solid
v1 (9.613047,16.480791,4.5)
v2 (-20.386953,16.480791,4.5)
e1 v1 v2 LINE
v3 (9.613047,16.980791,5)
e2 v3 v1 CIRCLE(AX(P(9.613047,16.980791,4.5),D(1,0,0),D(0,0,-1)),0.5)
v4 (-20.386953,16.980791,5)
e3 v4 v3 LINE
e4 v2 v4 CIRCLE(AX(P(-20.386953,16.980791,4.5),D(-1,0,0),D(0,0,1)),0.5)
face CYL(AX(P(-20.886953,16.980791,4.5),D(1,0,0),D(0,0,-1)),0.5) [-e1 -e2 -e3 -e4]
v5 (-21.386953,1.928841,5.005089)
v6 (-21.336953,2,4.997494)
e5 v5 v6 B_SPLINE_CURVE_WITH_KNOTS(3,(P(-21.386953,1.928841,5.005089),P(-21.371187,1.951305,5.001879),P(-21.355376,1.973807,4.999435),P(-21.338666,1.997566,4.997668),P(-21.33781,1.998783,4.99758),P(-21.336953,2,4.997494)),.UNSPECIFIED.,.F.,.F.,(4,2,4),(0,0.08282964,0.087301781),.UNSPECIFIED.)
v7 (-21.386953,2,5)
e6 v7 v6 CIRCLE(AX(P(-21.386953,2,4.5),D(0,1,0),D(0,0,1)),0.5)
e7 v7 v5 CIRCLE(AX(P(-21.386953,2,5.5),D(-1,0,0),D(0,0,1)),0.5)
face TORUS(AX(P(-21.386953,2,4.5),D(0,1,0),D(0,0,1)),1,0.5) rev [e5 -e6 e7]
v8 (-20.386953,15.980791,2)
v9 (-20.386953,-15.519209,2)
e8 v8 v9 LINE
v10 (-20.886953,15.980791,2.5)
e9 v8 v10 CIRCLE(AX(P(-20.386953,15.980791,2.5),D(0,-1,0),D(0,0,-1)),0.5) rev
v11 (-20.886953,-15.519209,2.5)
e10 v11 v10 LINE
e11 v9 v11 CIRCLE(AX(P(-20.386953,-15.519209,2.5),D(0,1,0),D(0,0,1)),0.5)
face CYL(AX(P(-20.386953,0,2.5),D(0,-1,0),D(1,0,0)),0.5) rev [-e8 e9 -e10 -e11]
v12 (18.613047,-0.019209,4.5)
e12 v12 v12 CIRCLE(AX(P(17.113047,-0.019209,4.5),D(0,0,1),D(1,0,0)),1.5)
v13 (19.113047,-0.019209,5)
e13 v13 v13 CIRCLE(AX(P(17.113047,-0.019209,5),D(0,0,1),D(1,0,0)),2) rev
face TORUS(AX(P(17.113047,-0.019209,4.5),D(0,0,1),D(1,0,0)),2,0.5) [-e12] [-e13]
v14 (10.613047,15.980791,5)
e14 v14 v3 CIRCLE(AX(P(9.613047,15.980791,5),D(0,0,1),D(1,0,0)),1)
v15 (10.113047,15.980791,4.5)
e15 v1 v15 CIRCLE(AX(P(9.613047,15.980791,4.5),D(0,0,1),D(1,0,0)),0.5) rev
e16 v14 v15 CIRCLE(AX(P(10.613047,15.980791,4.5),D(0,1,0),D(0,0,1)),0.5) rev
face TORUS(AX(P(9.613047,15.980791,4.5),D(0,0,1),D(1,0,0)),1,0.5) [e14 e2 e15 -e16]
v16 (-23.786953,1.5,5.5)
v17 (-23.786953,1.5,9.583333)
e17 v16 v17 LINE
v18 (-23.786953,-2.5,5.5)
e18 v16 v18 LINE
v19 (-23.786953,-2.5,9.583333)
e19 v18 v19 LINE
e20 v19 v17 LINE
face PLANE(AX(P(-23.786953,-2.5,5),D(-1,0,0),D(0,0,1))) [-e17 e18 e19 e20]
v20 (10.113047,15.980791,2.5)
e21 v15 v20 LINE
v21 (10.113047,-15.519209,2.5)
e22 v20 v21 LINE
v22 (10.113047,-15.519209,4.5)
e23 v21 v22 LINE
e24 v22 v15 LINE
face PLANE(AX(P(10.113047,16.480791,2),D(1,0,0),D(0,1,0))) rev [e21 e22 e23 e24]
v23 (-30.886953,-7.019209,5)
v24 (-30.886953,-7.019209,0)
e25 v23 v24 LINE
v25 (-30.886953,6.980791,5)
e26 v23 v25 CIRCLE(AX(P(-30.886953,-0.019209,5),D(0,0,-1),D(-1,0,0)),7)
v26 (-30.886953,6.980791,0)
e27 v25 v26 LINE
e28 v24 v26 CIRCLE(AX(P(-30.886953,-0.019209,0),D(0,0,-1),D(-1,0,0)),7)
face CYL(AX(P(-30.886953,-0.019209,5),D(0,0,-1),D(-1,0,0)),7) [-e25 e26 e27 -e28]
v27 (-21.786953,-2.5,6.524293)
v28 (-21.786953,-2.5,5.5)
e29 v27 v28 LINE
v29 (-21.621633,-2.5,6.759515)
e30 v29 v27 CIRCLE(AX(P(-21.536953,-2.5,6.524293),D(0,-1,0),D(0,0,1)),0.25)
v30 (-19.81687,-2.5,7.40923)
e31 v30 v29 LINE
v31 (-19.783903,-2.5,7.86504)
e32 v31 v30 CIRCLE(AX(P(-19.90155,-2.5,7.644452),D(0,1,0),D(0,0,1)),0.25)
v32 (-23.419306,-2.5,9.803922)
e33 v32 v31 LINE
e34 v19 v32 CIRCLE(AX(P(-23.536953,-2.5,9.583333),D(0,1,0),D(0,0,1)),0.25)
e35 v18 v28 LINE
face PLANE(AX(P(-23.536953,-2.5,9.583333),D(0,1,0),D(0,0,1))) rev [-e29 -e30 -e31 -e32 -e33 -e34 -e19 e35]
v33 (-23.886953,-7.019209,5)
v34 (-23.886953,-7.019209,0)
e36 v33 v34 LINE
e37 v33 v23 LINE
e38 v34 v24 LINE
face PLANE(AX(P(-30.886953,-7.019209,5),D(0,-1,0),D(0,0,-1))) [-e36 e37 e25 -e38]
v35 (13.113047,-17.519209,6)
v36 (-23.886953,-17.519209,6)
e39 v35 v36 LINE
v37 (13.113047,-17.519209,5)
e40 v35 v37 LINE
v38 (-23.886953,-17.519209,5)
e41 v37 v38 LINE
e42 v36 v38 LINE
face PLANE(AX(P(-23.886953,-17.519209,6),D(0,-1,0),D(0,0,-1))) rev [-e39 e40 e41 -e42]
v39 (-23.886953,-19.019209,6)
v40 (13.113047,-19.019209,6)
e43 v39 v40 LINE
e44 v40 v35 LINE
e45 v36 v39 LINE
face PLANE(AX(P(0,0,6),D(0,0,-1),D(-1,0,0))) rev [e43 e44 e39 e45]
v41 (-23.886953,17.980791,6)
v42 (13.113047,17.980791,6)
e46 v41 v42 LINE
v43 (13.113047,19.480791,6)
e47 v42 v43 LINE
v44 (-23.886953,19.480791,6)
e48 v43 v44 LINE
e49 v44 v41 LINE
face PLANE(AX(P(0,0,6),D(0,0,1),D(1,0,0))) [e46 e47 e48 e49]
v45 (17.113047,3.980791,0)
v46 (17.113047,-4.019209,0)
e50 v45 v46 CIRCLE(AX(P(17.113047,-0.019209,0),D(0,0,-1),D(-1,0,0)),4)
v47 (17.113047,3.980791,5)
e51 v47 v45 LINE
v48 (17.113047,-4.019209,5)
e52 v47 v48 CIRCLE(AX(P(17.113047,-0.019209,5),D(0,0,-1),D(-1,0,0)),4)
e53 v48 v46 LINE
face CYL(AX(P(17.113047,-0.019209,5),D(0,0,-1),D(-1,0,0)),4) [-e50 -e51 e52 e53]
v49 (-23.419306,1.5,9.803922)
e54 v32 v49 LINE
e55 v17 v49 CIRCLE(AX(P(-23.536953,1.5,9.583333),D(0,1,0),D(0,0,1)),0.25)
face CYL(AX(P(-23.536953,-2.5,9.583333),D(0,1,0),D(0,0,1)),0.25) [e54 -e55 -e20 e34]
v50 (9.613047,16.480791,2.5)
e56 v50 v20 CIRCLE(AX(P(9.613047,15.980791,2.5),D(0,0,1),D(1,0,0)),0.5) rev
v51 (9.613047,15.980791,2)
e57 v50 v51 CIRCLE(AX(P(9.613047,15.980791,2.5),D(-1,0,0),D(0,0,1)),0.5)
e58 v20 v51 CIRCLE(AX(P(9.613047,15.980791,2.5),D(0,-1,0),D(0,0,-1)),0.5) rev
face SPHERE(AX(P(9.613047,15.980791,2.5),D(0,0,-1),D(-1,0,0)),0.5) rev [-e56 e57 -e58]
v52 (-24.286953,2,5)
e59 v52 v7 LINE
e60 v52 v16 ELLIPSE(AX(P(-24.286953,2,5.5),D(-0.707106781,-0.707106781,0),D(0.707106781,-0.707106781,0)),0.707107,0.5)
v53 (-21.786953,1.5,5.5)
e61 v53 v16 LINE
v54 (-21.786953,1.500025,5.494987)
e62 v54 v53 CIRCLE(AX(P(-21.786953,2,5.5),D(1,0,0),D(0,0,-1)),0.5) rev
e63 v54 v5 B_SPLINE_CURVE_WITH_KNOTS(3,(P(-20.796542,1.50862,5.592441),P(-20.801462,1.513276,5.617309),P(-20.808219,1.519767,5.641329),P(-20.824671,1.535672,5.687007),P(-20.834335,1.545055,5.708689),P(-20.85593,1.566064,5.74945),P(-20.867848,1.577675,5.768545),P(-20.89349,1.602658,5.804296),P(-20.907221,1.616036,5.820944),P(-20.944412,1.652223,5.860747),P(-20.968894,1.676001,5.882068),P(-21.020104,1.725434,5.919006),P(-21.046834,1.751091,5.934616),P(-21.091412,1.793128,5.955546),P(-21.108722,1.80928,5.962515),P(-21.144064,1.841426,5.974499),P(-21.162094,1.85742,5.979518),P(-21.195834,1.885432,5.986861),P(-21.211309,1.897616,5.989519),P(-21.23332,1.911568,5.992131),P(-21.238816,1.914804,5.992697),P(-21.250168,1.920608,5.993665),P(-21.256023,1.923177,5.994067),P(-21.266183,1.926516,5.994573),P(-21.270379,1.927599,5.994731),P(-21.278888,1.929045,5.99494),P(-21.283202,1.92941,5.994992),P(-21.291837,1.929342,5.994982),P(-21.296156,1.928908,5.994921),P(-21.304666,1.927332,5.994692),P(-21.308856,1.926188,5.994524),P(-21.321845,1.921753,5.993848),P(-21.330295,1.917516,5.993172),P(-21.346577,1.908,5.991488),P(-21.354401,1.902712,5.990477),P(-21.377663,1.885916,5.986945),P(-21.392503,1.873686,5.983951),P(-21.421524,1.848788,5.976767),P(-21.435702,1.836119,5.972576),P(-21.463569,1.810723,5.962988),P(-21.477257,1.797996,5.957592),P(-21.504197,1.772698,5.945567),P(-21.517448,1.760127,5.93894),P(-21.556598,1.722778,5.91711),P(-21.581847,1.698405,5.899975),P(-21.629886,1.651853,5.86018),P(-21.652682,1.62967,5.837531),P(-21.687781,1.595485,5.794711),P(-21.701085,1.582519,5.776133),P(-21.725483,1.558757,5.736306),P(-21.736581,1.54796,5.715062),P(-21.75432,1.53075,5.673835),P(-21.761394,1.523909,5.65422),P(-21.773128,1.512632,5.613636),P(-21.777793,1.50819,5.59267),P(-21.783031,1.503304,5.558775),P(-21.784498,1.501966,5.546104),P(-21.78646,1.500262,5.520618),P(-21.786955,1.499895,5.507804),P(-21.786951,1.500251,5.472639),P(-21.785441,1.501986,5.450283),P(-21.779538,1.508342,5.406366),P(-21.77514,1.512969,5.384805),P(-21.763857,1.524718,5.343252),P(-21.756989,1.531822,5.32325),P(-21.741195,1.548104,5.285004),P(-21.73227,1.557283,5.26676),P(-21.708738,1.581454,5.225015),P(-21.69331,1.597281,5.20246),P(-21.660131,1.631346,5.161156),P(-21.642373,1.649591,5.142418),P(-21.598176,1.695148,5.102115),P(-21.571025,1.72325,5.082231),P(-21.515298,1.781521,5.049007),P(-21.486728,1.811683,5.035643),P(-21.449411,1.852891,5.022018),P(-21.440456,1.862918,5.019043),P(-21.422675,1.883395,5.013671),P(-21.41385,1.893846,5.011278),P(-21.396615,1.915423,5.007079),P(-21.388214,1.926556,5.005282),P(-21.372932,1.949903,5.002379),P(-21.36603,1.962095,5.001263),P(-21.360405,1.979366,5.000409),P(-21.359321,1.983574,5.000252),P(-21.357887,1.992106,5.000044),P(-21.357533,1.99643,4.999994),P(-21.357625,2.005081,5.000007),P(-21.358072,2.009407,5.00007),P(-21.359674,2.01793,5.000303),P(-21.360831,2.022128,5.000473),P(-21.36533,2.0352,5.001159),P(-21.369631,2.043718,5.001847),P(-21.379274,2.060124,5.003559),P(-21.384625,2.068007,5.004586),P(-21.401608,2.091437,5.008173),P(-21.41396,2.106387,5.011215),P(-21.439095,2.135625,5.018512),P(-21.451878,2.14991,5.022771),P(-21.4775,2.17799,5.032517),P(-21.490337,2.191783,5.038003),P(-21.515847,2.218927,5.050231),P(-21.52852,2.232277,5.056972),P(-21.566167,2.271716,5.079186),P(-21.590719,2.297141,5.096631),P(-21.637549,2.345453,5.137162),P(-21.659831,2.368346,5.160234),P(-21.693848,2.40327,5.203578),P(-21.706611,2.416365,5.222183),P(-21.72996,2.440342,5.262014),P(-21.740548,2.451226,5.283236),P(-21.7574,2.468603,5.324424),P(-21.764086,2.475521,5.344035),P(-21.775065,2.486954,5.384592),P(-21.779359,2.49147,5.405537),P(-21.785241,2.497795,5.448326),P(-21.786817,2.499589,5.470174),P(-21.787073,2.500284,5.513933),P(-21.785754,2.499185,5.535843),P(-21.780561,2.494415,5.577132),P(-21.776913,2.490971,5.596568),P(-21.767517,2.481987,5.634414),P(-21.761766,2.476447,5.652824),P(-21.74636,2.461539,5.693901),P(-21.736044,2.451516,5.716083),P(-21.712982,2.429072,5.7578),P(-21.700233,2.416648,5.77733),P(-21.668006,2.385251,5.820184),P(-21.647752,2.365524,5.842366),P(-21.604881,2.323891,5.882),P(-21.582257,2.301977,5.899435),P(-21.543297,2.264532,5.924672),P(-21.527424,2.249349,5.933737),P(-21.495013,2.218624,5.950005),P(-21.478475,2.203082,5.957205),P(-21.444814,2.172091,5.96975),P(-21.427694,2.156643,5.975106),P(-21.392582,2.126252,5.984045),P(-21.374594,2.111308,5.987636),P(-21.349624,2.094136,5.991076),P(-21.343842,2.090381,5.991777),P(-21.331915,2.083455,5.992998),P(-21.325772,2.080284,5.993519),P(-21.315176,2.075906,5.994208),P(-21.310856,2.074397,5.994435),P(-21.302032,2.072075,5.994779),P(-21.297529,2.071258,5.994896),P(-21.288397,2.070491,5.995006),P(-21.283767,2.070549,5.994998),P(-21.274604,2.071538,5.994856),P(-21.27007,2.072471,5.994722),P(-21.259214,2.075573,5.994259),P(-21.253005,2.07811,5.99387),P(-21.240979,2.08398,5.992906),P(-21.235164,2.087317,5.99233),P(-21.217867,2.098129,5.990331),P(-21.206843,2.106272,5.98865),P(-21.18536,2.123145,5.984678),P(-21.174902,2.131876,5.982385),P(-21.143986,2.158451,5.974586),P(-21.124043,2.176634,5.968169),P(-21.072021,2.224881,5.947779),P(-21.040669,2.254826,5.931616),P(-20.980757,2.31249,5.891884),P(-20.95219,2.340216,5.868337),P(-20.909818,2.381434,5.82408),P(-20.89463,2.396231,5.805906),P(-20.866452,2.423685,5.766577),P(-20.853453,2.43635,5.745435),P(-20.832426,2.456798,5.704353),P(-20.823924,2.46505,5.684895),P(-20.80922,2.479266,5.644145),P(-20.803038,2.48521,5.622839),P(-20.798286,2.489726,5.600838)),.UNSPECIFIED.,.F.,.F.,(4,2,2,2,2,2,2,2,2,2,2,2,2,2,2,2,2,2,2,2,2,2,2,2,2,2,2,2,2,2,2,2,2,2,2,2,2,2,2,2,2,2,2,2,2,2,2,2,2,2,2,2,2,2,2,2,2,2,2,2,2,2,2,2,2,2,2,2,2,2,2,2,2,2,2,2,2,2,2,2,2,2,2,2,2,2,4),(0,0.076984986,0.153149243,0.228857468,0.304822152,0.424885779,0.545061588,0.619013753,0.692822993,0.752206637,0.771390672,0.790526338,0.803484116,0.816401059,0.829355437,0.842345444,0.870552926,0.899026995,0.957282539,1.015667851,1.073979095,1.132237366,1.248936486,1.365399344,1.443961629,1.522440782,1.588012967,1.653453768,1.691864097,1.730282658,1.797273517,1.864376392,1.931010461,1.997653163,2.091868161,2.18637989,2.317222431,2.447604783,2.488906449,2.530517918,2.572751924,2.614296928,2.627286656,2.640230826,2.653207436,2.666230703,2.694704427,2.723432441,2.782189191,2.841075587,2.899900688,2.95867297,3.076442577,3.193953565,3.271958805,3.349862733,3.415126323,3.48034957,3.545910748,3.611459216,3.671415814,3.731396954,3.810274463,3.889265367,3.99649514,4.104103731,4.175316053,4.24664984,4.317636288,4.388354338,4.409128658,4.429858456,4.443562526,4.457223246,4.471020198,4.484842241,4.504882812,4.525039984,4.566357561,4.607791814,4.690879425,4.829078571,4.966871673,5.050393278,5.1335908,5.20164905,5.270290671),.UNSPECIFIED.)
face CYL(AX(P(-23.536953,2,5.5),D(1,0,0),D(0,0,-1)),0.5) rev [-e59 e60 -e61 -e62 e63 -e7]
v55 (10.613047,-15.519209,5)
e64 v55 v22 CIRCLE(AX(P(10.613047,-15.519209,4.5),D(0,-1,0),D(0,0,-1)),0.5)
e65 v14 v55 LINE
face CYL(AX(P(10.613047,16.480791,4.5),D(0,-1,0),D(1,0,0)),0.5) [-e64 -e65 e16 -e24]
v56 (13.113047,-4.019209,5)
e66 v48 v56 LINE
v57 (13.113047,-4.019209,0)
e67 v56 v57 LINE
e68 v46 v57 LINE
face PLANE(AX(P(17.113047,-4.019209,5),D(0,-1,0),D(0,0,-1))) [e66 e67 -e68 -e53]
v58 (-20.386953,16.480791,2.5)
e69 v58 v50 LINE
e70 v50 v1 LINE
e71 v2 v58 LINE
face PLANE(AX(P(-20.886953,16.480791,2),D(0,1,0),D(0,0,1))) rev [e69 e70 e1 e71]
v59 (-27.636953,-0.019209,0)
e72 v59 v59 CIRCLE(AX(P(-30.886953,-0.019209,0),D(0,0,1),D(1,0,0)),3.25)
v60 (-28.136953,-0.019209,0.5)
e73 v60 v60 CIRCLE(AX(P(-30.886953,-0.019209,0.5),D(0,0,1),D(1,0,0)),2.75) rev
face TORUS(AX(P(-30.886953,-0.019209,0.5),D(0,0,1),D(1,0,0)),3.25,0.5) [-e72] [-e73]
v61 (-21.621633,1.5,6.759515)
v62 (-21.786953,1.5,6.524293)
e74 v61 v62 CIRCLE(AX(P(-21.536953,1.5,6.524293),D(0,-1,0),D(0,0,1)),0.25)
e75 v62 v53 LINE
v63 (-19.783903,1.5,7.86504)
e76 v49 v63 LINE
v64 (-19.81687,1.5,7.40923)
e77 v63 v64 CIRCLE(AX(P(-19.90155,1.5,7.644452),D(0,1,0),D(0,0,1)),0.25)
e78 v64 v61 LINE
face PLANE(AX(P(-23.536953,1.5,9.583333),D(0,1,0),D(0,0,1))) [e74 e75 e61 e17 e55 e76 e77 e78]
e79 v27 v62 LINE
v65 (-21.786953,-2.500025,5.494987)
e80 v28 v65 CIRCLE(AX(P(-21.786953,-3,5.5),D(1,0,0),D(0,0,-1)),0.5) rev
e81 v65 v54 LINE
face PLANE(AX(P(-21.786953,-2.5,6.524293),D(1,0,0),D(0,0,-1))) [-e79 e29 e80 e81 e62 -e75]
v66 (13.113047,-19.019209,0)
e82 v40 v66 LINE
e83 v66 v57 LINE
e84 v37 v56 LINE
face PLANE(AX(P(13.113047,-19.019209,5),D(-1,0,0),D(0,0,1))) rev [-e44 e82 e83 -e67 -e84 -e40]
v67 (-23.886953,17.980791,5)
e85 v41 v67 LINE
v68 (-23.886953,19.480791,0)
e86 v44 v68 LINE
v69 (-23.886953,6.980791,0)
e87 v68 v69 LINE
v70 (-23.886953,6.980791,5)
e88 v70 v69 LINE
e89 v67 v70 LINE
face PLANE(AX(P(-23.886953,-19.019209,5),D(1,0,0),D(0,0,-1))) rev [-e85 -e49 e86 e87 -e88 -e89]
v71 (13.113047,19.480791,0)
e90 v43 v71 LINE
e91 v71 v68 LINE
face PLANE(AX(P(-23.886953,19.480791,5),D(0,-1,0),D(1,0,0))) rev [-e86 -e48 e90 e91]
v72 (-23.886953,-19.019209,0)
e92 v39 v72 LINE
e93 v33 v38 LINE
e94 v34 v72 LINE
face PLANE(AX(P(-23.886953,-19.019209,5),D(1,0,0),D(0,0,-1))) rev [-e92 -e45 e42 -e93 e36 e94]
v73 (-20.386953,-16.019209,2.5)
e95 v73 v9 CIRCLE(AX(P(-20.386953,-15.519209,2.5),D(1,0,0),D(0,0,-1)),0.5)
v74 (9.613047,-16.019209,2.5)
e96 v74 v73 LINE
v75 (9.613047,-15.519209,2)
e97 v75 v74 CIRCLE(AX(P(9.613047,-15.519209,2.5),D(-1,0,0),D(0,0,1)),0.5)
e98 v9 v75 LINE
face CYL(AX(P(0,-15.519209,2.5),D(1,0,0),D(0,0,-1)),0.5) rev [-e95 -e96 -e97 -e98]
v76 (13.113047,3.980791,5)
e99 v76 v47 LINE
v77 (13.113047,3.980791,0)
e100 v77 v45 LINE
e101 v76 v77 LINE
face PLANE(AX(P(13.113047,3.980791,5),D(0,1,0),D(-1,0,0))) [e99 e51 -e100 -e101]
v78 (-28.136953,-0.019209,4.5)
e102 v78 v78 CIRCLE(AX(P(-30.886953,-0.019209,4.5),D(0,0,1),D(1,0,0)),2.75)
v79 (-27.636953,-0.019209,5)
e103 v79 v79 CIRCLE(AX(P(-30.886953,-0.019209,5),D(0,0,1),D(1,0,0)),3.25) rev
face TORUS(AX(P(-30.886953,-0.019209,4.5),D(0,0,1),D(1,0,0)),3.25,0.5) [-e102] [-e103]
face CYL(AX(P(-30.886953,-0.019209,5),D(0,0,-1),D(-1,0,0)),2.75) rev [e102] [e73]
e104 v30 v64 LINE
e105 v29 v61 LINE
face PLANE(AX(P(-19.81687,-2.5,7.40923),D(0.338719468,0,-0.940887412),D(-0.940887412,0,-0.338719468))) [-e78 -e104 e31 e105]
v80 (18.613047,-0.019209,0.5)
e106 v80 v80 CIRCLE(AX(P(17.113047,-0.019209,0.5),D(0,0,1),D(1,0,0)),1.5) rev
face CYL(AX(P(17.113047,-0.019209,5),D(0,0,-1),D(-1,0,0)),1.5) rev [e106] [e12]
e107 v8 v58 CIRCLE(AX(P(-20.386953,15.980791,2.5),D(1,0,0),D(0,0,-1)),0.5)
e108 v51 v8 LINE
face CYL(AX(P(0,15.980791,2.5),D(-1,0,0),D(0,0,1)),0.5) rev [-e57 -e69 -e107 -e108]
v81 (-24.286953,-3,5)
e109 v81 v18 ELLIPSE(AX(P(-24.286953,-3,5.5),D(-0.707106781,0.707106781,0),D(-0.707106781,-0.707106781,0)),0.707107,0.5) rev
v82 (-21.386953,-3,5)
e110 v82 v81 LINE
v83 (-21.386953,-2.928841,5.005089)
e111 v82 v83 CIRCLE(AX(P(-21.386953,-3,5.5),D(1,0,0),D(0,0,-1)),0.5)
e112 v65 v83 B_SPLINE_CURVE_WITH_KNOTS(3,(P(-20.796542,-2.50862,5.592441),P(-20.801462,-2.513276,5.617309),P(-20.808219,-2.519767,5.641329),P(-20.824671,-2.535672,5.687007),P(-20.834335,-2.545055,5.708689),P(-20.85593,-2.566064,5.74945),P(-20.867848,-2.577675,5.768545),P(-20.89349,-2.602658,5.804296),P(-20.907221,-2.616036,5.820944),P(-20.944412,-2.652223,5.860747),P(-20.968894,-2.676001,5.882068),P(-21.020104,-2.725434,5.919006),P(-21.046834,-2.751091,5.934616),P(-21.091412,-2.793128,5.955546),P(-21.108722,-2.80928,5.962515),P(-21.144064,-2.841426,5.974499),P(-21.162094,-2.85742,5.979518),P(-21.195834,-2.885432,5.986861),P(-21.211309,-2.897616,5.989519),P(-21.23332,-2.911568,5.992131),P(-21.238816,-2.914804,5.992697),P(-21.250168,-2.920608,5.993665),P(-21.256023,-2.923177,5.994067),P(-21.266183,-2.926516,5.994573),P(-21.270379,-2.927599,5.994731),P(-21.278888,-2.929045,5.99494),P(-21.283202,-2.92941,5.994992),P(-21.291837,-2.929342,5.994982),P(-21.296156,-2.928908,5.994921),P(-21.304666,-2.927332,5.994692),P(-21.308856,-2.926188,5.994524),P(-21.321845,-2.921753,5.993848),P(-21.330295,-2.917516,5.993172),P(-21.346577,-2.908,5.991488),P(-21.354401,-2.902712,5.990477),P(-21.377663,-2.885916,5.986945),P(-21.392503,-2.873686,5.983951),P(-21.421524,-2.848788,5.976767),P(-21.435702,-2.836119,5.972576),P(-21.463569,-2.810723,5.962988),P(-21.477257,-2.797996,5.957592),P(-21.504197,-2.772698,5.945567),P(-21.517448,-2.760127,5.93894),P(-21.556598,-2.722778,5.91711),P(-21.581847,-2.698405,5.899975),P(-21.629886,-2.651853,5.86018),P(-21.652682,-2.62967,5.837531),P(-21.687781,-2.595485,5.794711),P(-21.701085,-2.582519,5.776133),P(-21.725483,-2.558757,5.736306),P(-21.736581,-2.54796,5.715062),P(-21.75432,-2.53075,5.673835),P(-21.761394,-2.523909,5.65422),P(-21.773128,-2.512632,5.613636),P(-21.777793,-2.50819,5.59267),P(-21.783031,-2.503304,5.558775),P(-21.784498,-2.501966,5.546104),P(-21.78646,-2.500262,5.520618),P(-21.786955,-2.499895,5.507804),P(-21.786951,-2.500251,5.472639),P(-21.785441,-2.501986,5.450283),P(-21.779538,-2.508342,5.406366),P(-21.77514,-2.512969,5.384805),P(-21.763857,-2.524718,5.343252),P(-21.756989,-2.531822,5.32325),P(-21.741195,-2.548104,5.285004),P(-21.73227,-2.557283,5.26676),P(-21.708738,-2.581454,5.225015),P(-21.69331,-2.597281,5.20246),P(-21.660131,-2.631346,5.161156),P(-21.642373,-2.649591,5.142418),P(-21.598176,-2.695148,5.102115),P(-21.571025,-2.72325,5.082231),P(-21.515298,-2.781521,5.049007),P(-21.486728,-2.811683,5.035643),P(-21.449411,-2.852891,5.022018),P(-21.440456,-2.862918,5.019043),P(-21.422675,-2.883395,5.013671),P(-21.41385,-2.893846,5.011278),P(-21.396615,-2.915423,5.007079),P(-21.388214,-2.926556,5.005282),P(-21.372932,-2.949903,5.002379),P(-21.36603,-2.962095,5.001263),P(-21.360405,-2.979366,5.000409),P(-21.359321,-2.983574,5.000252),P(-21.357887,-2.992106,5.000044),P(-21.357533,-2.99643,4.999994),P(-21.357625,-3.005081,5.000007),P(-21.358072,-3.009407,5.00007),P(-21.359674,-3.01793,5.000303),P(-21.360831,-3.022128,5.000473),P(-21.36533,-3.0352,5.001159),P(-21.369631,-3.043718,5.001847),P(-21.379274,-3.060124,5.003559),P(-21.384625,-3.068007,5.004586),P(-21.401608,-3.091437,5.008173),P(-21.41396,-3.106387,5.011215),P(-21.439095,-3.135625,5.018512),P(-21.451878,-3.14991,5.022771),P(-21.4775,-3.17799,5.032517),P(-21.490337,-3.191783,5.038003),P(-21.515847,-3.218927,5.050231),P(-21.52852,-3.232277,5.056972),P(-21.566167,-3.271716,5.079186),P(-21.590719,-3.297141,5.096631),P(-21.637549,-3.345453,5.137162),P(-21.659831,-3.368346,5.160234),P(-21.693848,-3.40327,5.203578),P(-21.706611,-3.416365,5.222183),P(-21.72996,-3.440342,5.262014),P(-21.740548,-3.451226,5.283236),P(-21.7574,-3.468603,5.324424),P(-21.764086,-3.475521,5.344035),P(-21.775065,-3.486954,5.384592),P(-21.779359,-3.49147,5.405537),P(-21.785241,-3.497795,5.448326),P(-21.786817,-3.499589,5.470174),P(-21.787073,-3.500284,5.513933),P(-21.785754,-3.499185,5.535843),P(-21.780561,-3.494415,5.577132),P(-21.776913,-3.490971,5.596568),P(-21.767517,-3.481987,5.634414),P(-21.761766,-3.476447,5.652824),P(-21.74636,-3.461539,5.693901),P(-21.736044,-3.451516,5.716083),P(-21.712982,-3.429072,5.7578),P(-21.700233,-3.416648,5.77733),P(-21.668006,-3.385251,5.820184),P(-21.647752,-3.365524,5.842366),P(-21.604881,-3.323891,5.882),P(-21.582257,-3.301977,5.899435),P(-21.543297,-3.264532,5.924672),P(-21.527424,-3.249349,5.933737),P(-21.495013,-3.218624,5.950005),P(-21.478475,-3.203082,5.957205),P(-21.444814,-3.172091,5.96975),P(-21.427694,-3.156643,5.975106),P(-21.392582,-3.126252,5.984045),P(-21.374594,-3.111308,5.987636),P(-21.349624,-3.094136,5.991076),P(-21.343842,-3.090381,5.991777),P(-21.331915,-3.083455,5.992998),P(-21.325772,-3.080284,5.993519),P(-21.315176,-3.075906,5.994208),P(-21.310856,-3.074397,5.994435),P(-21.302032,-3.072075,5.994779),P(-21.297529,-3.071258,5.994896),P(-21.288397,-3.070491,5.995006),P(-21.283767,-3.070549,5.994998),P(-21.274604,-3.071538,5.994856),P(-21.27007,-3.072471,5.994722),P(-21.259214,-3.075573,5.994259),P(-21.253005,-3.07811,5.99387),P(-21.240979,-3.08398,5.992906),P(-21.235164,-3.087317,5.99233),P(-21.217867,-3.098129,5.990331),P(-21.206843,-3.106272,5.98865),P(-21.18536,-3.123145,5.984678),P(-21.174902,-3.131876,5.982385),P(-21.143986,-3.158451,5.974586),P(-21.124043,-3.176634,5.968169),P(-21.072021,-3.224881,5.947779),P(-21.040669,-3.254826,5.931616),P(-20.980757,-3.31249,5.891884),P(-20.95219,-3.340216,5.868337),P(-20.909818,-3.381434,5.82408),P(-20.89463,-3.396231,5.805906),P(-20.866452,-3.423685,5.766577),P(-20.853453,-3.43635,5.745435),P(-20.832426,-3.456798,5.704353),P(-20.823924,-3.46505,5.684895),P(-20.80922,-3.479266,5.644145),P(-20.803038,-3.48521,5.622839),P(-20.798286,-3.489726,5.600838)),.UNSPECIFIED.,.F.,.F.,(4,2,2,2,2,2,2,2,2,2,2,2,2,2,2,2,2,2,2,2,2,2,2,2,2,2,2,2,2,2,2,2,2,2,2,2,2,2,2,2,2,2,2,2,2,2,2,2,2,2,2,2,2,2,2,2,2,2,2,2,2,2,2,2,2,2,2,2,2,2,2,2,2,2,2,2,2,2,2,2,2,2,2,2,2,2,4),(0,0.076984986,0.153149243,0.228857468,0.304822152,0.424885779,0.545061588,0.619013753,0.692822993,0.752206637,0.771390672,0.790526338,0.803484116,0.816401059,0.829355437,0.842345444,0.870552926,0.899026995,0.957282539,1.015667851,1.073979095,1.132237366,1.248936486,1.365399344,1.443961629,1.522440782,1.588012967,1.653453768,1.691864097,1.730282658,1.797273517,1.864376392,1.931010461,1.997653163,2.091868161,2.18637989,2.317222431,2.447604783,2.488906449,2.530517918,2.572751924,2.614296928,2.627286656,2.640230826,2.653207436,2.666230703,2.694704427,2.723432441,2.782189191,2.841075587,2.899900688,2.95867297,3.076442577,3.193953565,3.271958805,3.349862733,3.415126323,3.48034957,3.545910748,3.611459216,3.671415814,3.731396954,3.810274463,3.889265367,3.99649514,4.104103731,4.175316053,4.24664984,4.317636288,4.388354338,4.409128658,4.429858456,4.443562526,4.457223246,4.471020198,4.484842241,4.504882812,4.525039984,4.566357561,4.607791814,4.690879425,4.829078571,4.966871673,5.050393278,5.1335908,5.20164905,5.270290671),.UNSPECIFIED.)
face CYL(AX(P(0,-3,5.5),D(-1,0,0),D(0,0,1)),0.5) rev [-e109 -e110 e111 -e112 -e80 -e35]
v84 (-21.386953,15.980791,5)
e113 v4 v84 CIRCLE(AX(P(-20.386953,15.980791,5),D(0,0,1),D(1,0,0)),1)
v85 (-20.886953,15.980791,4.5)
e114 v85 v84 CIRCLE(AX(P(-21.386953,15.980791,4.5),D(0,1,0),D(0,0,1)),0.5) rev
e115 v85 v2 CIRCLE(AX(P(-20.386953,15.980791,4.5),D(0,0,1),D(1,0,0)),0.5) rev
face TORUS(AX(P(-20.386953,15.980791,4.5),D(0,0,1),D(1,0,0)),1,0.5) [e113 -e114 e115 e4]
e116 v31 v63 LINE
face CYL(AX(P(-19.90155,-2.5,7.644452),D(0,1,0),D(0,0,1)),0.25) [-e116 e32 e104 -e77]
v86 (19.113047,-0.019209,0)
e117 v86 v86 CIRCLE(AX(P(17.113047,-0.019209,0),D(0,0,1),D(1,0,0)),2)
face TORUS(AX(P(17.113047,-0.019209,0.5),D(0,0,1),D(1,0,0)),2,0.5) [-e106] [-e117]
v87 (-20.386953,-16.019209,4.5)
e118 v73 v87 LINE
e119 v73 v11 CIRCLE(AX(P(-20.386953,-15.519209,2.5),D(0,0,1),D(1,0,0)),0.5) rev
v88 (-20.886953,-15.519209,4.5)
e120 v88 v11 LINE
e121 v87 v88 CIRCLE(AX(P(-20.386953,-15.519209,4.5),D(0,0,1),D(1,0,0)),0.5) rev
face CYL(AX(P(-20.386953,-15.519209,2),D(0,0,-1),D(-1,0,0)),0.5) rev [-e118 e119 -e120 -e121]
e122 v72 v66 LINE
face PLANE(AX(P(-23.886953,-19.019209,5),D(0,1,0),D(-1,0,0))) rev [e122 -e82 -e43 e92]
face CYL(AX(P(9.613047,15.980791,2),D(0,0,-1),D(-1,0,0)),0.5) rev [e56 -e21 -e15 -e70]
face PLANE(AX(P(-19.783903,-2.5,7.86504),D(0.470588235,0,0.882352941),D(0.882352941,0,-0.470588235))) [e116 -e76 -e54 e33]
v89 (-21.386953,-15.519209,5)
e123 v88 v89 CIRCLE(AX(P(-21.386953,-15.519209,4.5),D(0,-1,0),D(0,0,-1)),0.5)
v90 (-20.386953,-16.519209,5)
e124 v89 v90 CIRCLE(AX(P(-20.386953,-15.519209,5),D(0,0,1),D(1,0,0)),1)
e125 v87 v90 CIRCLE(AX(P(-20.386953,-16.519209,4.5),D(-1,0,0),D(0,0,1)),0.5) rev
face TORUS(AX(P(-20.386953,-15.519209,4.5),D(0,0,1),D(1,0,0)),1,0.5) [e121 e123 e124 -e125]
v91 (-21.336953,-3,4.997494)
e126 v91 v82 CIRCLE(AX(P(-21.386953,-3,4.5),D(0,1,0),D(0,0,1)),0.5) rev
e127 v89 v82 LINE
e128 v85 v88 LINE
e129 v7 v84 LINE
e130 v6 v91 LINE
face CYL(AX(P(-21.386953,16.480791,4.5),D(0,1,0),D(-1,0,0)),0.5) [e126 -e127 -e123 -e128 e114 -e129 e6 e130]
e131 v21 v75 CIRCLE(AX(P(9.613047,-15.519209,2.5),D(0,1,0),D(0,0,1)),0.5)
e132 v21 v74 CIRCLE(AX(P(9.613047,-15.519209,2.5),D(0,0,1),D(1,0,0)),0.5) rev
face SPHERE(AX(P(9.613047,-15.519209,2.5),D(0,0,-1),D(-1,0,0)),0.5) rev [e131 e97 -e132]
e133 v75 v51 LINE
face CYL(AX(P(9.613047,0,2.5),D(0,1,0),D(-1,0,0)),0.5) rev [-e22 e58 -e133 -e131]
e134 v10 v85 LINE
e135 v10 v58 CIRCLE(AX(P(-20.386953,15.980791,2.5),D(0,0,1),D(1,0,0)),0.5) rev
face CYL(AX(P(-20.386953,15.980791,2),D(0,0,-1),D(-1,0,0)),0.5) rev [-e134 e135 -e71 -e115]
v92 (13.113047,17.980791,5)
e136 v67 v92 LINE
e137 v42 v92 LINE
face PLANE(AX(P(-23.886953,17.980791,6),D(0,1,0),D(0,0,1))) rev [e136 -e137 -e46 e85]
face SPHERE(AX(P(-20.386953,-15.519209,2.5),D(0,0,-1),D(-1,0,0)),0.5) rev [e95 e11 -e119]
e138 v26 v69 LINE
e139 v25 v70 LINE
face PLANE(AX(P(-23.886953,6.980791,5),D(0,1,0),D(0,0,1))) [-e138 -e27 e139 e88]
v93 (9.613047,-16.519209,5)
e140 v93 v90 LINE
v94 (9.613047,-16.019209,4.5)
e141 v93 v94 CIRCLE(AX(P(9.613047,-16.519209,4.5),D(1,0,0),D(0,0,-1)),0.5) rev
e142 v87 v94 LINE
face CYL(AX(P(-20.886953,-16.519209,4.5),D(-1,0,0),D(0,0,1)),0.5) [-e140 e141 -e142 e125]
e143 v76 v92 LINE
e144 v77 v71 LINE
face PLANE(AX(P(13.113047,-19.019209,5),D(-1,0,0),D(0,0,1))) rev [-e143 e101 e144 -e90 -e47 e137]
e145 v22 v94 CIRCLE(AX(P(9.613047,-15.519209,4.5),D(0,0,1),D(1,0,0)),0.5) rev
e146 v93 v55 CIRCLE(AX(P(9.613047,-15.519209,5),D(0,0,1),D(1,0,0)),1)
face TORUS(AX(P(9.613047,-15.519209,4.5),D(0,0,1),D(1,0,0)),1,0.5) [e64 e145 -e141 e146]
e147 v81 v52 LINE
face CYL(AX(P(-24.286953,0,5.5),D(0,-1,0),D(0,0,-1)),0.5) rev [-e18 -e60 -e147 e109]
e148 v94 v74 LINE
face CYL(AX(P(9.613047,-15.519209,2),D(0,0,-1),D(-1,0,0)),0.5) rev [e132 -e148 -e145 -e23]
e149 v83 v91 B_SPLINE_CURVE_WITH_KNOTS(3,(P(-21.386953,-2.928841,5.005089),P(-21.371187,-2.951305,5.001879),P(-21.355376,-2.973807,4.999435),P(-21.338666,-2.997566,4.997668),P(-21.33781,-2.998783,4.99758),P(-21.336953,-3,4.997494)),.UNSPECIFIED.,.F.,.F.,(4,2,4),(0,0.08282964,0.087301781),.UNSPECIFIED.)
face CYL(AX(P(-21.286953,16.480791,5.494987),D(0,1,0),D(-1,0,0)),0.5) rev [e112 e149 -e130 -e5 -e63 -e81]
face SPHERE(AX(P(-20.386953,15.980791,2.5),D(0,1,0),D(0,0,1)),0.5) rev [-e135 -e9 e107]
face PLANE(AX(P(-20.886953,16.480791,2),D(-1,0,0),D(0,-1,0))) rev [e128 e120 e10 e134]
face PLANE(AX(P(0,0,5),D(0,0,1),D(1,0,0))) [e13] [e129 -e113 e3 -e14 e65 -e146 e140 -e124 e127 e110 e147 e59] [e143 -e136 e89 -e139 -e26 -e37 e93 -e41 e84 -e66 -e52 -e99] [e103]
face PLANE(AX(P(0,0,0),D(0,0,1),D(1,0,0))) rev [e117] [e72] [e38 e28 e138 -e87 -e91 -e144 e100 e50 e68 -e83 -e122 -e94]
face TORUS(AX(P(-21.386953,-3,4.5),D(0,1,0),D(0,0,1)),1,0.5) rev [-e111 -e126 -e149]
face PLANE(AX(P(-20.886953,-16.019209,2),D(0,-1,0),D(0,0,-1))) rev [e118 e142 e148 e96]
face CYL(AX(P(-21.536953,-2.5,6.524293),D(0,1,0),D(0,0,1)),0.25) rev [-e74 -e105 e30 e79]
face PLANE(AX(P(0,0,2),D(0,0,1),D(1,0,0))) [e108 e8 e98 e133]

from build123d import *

# Parameters (mm, degrees)
SKETCH1_W                = 38.5
SKETCH1_H                = 37
BOSS_EXTRUDE1_DEPTH      = 5
SKETCH2_W                = 31
SKETCH2_H                = 32.5
CUT_EXTRUDE1_DEPTH       = 3
SKETCH9_R                = 1.5
SKETCH9_R_2              = 2.75
BOSS_EXTRUDE4_DEPTH      = 5
SKETCH10_W               = 37
SKETCH10_H               = 1.5
BOSS_EXTRUDE5_DEPTH      = 1
BOSS_EXTRUDE7_DEPTH      = 1.5
BOSS_EXTRUDE7_DEPTH_BACK = 2.5
FILLET2_R                = 0.5
FILLET4_R                = 0.5
FILLET7_R                = 0.5
FILLET10_R               = 0.5
FILLET11_R               = 0.5
FILLET12_R               = 0.5


with BuildPart() as part:
    # Sketch1 → Boss-Extrude1 (new body)
    with BuildSketch(Plane(origin=(0, 0, 0), x_dir=(0, 1, 0), z_dir=(0, 0, 1))):
        with Locations((0.230791095, 5.386953358)):
            Rectangle(SKETCH1_W, SKETCH1_H)
    extrude(amount=BOSS_EXTRUDE1_DEPTH)

    # Sketch2 → Cut-Extrude1 (cut)
    with BuildSketch(Plane.XY.offset(5)):
        with Locations((-5.386953358, 0.230791095)):
            Rectangle(SKETCH2_W, SKETCH2_H)
    extrude(amount=-CUT_EXTRUDE1_DEPTH, mode=Mode.SUBTRACT)

    # Sketch9 → Boss-Extrude4 (add)
    # profile 1 of 2: a face of its own
    with BuildSketch(Plane(origin=(0, 0, 0), x_dir=(1, 0, 0), z_dir=(0, 0, -1))):
        with BuildLine():
            Line((17.113046642, 4.019208905), (13.113046642, 4.019208905))
            Line((13.113046642, 4.019208905), (13.113046642, -3.980791095))
            Line((13.113046642, -3.980791095), (17.113046642, -3.980791095))
            ThreePointArc((17.113046642, -3.980791095), (21.113046642, 0.019208905), (17.113046642, 4.019208905))
        make_face()
        with Locations(Location((17.113046642, 0.019208905, 0), (0, 0, 180))):
            Circle(SKETCH9_R, mode=Mode.SUBTRACT)
    # profile 2 of 2: a face of its own
    with BuildSketch(Plane(origin=(0, 0, 0), x_dir=(1, 0, 0), z_dir=(0, 0, -1))):
        with BuildLine():
            Line((-30.886953358, 7.019208905), (-23.886953358, 7.019208905))
            Line((-23.886953358, 7.019208905), (-23.886953358, -6.980791095))
            Line((-23.886953358, -6.980791095), (-30.886953358, -6.980791095))
            ThreePointArc((-30.886953358, -6.980791095), (-37.886953358, 0.019208905), (-30.886953358, 7.019208905))
        make_face()
        with Locations(Location((-30.886953358, 0.019208905, 0), (0, 0, 180))):
            Circle(SKETCH9_R_2, mode=Mode.SUBTRACT)
    extrude(amount=-BOSS_EXTRUDE4_DEPTH)

    # Sketch10 → Boss-Extrude5 (add)
    with BuildSketch(Plane.XY.offset(5)):
        with Locations((-5.386953358, 18.730791095)):
            Rectangle(SKETCH10_W, SKETCH10_H)
        with Locations((-5.386953358, -18.269208905)):
            Rectangle(SKETCH10_W, SKETCH10_H)
    extrude(amount=BOSS_EXTRUDE5_DEPTH)

    # Sketch12 → Boss-Extrude7 (add, two sides: drawn at the far end of the back side and taken through both)
    with BuildSketch(Plane(origin=(0, 0, 0), x_dir=(-1, 0, 0), z_dir=(0, 1, 0)).offset(-BOSS_EXTRUDE7_DEPTH_BACK)):
        with BuildLine():
            Line((21.786953358, 6.524293395), (21.786953358, 5))
            Line((21.786953358, 5), (23.786953358, 5))
            Line((23.786953358, 5), (23.786953358, 9.583333333))
            ThreePointArc((23.786953358, 9.583333333), (23.665577297, 9.797706565), (23.4193063, 9.803921569))
            Line((23.4193063, 9.803921569), (19.783903246, 7.86503994))
            ThreePointArc((19.783903246, 7.86503994), (19.652201642, 7.626417165), (19.816870437, 7.409229852))
            Line((19.816870437, 7.409229852), (21.621633225, 6.759515248))
            ThreePointArc((21.621633225, 6.759515248), (21.741489378, 6.668046714), (21.786953358, 6.524293395))
        make_face()
    extrude(amount=BOSS_EXTRUDE7_DEPTH + BOSS_EXTRUDE7_DEPTH_BACK)

    # Fillet2
    fillet2_edges = [part.edges().sort_by_distance(p)[0] for p in [
        (18.613046642, -0.019208905, 5),
    ]]
    fillet(fillet2_edges, radius=FILLET2_R)

    # Fillet4
    fillet4_edges = [part.edges().sort_by_distance(p)[0] for p in [
        (-20.886953358, 0.230791095, 2),
        (-20.886953358, -16.019208905, 3.5),
        (-5.386953358, 16.480791095, 2),
        (-20.886953358, 16.480791095, 3.5),
        (10.113046642, 0.230791095, 2),
        (10.113046642, 16.480791095, 3.5),
        (-5.386953358, -16.019208905, 2),
        (10.113046642, -16.019208905, 3.5),
        (-20.886953358, 0.230791095, 5),
        (-5.386953358, -16.019208905, 5),
        (10.113046642, 0.230791095, 5),
        (-5.386953358, 16.480791095, 5),
    ]]
    fillet(fillet4_edges, radius=FILLET4_R)

    # Fillet7
    # the kernel refuses this fillet: 0.5 mm, written as the material it adds along each edge
    with BuildSketch(Plane(origin=(-23.786953358, -2.5, 5), x_dir=(-1, 0, 0), z_dir=(0, 1, 0))) as fillet7_piece_1:
        with BuildLine():
            CenterArc((FILLET7_R, FILLET7_R), FILLET7_R, 180, 90)
            Line((0, FILLET7_R), (-FILLET7_R * 0.02, FILLET7_R))
            Line((-FILLET7_R * 0.02, FILLET7_R), (-FILLET7_R * 0.02, -FILLET7_R * 0.02))
            Line((-FILLET7_R * 0.02, -FILLET7_R * 0.02), (FILLET7_R, -FILLET7_R * 0.02))
            Line((FILLET7_R, -FILLET7_R * 0.02), (FILLET7_R, 0))
        make_face()
    fillet7_piece_1_solid = extrude(amount=4, mode=Mode.PRIVATE)
    with BuildSketch(Plane(origin=(-21.786953358, -2.5, 5), x_dir=(0, -1, 0), z_dir=(-1, 0, 0))) as fillet7_piece_2:
        with BuildLine():
            CenterArc((FILLET7_R, FILLET7_R), FILLET7_R, 180, 90)
            Line((0, FILLET7_R), (-FILLET7_R * 0.02, FILLET7_R))
            Line((-FILLET7_R * 0.02, FILLET7_R), (-FILLET7_R * 0.02, -FILLET7_R * 0.02))
            Line((-FILLET7_R * 0.02, -FILLET7_R * 0.02), (FILLET7_R, -FILLET7_R * 0.02))
            Line((FILLET7_R, -FILLET7_R * 0.02), (FILLET7_R, 0))
        make_face()
    fillet7_piece_2_solid = extrude(amount=2, mode=Mode.PRIVATE)
    with BuildSketch(Plane(origin=(-21.786953358, -2.5, 5), x_dir=(0.9999844906159053, 0, -0.005569427946243513), z_dir=(0, 1, 0))) as fillet7_piece_3:
        with BuildLine():
            CenterArc((0.497235448, -0.497764474), FILLET7_R, 95.420064112, 84.260829523)
            Line((-0.002756797, -0.49497976), (-0.052756021, -0.494701289))
            Line((-0.052756021, -0.494701289), (-0.049999225, 0.000278471))
            Line((-0.049999225, 0.000278471), (0.000278471, 0.049999225))
            ThreePointArc((0.000278471, 0.049999225), (0.400272268, 0.047771453), (0.445284132, 0.049776447))
            Line((0.445284132, 0.049776447), (0.450006979, 0))
        make_face()
    fillet7_piece_3_solid = extrude(amount=4, mode=Mode.PRIVATE)
    with BuildSketch(Plane(origin=(-21.786953358, 1.5, 5), x_dir=(0, 1, 0), z_dir=(-1, 0, 0))) as fillet7_piece_4:
        with BuildLine():
            CenterArc((FILLET7_R, -FILLET7_R), FILLET7_R, 90, 90)
            Line((0, -FILLET7_R), (-FILLET7_R * 0.02, -FILLET7_R))
            Line((-FILLET7_R * 0.02, -FILLET7_R), (-FILLET7_R * 0.02, FILLET7_R * 0.02))
            Line((-FILLET7_R * 0.02, FILLET7_R * 0.02), (FILLET7_R, FILLET7_R * 0.02))
            Line((FILLET7_R, FILLET7_R * 0.02), (FILLET7_R, 0))
        make_face()
    fillet7_piece_4_solid = extrude(amount=2, mode=Mode.PRIVATE)
    with BuildSketch(Plane(origin=(-21.786953358, -2.5, 5), x_dir=(0, -1, 0), z_dir=(-1, 0, 0))) as fillet7_piece_5a_section:
        with BuildLine():
            CenterArc((FILLET7_R, FILLET7_R), FILLET7_R, 180, 90)
            Line((0, FILLET7_R), (-FILLET7_R * 0.02, FILLET7_R))
            Line((-FILLET7_R * 0.02, FILLET7_R), (-FILLET7_R * 0.02, -FILLET7_R * 0.02))
            Line((-FILLET7_R * 0.02, -FILLET7_R * 0.02), (FILLET7_R, -FILLET7_R * 0.02))
            Line((FILLET7_R, -FILLET7_R * 0.02), (FILLET7_R, 0))
        make_face()
    fillet7_piece_5a = extrude(amount=3.25, mode=Mode.PRIVATE)
    fillet7_piece_5a = split(fillet7_piece_5a, bisect_by=Plane(origin=(-23.786953358, -2.613197557, 5.113197557), z_dir=(-1, 0, 0)), keep=Keep.TOP, mode=Mode.PRIVATE)
    with BuildSketch(Plane(origin=(-23.786953358, -3.75, 5), x_dir=(-1, 0, 0), z_dir=(0, 1, 0))) as fillet7_piece_5b_section:
        with BuildLine():
            CenterArc((FILLET7_R, FILLET7_R), FILLET7_R, 180, 90)
            Line((0, FILLET7_R), (-FILLET7_R * 0.02, FILLET7_R))
            Line((-FILLET7_R * 0.02, FILLET7_R), (-FILLET7_R * 0.02, -FILLET7_R * 0.02))
            Line((-FILLET7_R * 0.02, -FILLET7_R * 0.02), (FILLET7_R, -FILLET7_R * 0.02))
            Line((FILLET7_R, -FILLET7_R * 0.02), (FILLET7_R, 0))
        make_face()
    fillet7_piece_5b = extrude(amount=5.25, mode=Mode.PRIVATE)
    fillet7_piece_5b = split(fillet7_piece_5b, bisect_by=Plane(origin=(-23.900150915, -2.5, 5.113197557), z_dir=(0, -1, 0)), keep=Keep.TOP, mode=Mode.PRIVATE)
    fillet7_piece_5 = fillet7_piece_5a & fillet7_piece_5b
    with BuildSketch(Plane(origin=(-23.786953358, -2.5, 5), x_dir=(-1, 0, 0), z_dir=(0, 1, 0))) as fillet7_piece_6a_section:
        with BuildLine():
            CenterArc((FILLET7_R, FILLET7_R), FILLET7_R, 180, 90)
            Line((0, FILLET7_R), (-FILLET7_R * 0.02, FILLET7_R))
            Line((-FILLET7_R * 0.02, FILLET7_R), (-FILLET7_R * 0.02, -FILLET7_R * 0.02))
            Line((-FILLET7_R * 0.02, -FILLET7_R * 0.02), (FILLET7_R, -FILLET7_R * 0.02))
            Line((FILLET7_R, -FILLET7_R * 0.02), (FILLET7_R, 0))
        make_face()
    fillet7_piece_6a = extrude(amount=5.25, mode=Mode.PRIVATE)
    fillet7_piece_6a = split(fillet7_piece_6a, bisect_by=Plane(origin=(-23.900150915, 1.5, 5.113197557), z_dir=(0, 1, 0)), keep=Keep.TOP, mode=Mode.PRIVATE)
    with BuildSketch(Plane(origin=(-21.786953358, 1.5, 5), x_dir=(0, 1, 0), z_dir=(-1, 0, 0))) as fillet7_piece_6b_section:
        with BuildLine():
            CenterArc((FILLET7_R, -FILLET7_R), FILLET7_R, 90, 90)
            Line((0, -FILLET7_R), (-FILLET7_R * 0.02, -FILLET7_R))
            Line((-FILLET7_R * 0.02, -FILLET7_R), (-FILLET7_R * 0.02, FILLET7_R * 0.02))
            Line((-FILLET7_R * 0.02, FILLET7_R * 0.02), (FILLET7_R, FILLET7_R * 0.02))
            Line((FILLET7_R, FILLET7_R * 0.02), (FILLET7_R, 0))
        make_face()
    fillet7_piece_6b = extrude(amount=3.25, mode=Mode.PRIVATE)
    fillet7_piece_6b = split(fillet7_piece_6b, bisect_by=Plane(origin=(-23.786953358, 1.613197557, 5.113197557), z_dir=(-1, 0, 0)), keep=Keep.TOP, mode=Mode.PRIVATE)
    fillet7_piece_6 = fillet7_piece_6a & fillet7_piece_6b
    with BuildSketch(Plane(origin=(-20.536953358, -2.5, 5), x_dir=(0, -1, 0), z_dir=(-1, 0, 0))) as fillet7_piece_7a_section:
        with BuildLine():
            CenterArc((FILLET7_R, FILLET7_R), FILLET7_R, 180, 90)
            Line((0, FILLET7_R), (-FILLET7_R * 0.02, FILLET7_R))
            Line((-FILLET7_R * 0.02, FILLET7_R), (-FILLET7_R * 0.02, -FILLET7_R * 0.02))
            Line((-FILLET7_R * 0.02, -FILLET7_R * 0.02), (FILLET7_R, -FILLET7_R * 0.02))
            Line((FILLET7_R, -FILLET7_R * 0.02), (FILLET7_R, 0))
        make_face()
    fillet7_piece_7a = extrude(amount=3.25, mode=Mode.PRIVATE)
    fillet7_piece_7a = split(fillet7_piece_7a, bisect_by=Plane(origin=(-21.786953358, -2.613197557, 5.113197557), z_dir=(1, 0, 0)), keep=Keep.TOP, mode=Mode.PRIVATE)
    with BuildSketch(Plane(origin=(-21.786953358, -3.737468593, 5), x_dir=(0.9999844906159053, 0, -0.00556942794624154), z_dir=(0, 1, 0))) as fillet7_piece_7b_section:
        with BuildLine():
            CenterArc((0.497235448, -0.497764474), FILLET7_R, 95.420064112, 84.260829523)
            Line((-0.002756797, -0.49497976), (-0.052756021, -0.494701289))
            Line((-0.052756021, -0.494701289), (-0.049999225, 0.000278471))
            Line((-0.049999225, 0.000278471), (0.000278471, 0.049999225))
            ThreePointArc((0.000278471, 0.049999225), (0.400272268, 0.047771453), (0.445284132, 0.049776447))
            Line((0.445284132, 0.049776447), (0.450006979, 0))
        make_face()
    fillet7_piece_7b = extrude(amount=5.237468593, mode=Mode.PRIVATE)
    fillet7_piece_7b = split(fillet7_piece_7b, bisect_by=Plane(origin=(-21.689393004, -2.5, 5.114923371), z_dir=(0, -1, 0)), keep=Keep.TOP, mode=Mode.PRIVATE)
    fillet7_piece_7 = fillet7_piece_7a & fillet7_piece_7b
    with BuildSketch(Plane(origin=(-20.536953358, 1.5, 5), x_dir=(0, 1, 0), z_dir=(-1, 0, 0))) as fillet7_piece_8a_section:
        with BuildLine():
            CenterArc((FILLET7_R, -FILLET7_R), FILLET7_R, 90, 90)
            Line((0, -FILLET7_R), (-FILLET7_R * 0.02, -FILLET7_R))
            Line((-FILLET7_R * 0.02, -FILLET7_R), (-FILLET7_R * 0.02, FILLET7_R * 0.02))
            Line((-FILLET7_R * 0.02, FILLET7_R * 0.02), (FILLET7_R, FILLET7_R * 0.02))
            Line((FILLET7_R, FILLET7_R * 0.02), (FILLET7_R, 0))
        make_face()
    fillet7_piece_8a = extrude(amount=3.25, mode=Mode.PRIVATE)
    fillet7_piece_8a = split(fillet7_piece_8a, bisect_by=Plane(origin=(-21.786953358, 1.613197557, 5.113197557), z_dir=(1, 0, 0)), keep=Keep.TOP, mode=Mode.PRIVATE)
    with BuildSketch(Plane(origin=(-21.786953358, -2.5, 5), x_dir=(0.9999844906159053, 0, -0.005569427946243513), z_dir=(0, 1, 0))) as fillet7_piece_8b_section:
        with BuildLine():
            CenterArc((0.497235448, -0.497764474), FILLET7_R, 95.420064112, 84.260829523)
            Line((-0.002756797, -0.49497976), (-0.052756021, -0.494701289))
            Line((-0.052756021, -0.494701289), (-0.049999225, 0.000278471))
            Line((-0.049999225, 0.000278471), (0.000278471, 0.049999225))
            ThreePointArc((0.000278471, 0.049999225), (0.400272268, 0.047771453), (0.445284132, 0.049776447))
            Line((0.445284132, 0.049776447), (0.450006979, 0))
        make_face()
    fillet7_piece_8b = extrude(amount=5.237468593, mode=Mode.PRIVATE)
    fillet7_piece_8b = split(fillet7_piece_8b, bisect_by=Plane(origin=(-21.689393004, 1.5, 5.114923371), z_dir=(0, 1, 0)), keep=Keep.TOP, mode=Mode.PRIVATE)
    fillet7_piece_8 = fillet7_piece_8a & fillet7_piece_8b
    add([fillet7_piece_1_solid, fillet7_piece_2_solid, fillet7_piece_3_solid, fillet7_piece_4_solid, fillet7_piece_5, fillet7_piece_6, fillet7_piece_7, fillet7_piece_8])

    # Fillet10
    fillet10_edges = [part.edges().sort_by_distance(p)[0] for p in [
        (-28.136953358, -0.019208905, 5),
    ]]
    fillet(fillet10_edges, radius=FILLET10_R)

    # Fillet11
    fillet11_edges = [part.edges().sort_by_distance(p)[0] for p in [
        (18.613046642, -0.019208905, 0),
    ]]
    fillet(fillet11_edges, radius=FILLET11_R)

    # Fillet12
    fillet12_edges = [part.edges().sort_by_distance(p)[0] for p in [
        (-28.136953358, -0.019208905, 0),
    ]]
    fillet(fillet12_edges, radius=FILLET12_R)


solid = part.part
